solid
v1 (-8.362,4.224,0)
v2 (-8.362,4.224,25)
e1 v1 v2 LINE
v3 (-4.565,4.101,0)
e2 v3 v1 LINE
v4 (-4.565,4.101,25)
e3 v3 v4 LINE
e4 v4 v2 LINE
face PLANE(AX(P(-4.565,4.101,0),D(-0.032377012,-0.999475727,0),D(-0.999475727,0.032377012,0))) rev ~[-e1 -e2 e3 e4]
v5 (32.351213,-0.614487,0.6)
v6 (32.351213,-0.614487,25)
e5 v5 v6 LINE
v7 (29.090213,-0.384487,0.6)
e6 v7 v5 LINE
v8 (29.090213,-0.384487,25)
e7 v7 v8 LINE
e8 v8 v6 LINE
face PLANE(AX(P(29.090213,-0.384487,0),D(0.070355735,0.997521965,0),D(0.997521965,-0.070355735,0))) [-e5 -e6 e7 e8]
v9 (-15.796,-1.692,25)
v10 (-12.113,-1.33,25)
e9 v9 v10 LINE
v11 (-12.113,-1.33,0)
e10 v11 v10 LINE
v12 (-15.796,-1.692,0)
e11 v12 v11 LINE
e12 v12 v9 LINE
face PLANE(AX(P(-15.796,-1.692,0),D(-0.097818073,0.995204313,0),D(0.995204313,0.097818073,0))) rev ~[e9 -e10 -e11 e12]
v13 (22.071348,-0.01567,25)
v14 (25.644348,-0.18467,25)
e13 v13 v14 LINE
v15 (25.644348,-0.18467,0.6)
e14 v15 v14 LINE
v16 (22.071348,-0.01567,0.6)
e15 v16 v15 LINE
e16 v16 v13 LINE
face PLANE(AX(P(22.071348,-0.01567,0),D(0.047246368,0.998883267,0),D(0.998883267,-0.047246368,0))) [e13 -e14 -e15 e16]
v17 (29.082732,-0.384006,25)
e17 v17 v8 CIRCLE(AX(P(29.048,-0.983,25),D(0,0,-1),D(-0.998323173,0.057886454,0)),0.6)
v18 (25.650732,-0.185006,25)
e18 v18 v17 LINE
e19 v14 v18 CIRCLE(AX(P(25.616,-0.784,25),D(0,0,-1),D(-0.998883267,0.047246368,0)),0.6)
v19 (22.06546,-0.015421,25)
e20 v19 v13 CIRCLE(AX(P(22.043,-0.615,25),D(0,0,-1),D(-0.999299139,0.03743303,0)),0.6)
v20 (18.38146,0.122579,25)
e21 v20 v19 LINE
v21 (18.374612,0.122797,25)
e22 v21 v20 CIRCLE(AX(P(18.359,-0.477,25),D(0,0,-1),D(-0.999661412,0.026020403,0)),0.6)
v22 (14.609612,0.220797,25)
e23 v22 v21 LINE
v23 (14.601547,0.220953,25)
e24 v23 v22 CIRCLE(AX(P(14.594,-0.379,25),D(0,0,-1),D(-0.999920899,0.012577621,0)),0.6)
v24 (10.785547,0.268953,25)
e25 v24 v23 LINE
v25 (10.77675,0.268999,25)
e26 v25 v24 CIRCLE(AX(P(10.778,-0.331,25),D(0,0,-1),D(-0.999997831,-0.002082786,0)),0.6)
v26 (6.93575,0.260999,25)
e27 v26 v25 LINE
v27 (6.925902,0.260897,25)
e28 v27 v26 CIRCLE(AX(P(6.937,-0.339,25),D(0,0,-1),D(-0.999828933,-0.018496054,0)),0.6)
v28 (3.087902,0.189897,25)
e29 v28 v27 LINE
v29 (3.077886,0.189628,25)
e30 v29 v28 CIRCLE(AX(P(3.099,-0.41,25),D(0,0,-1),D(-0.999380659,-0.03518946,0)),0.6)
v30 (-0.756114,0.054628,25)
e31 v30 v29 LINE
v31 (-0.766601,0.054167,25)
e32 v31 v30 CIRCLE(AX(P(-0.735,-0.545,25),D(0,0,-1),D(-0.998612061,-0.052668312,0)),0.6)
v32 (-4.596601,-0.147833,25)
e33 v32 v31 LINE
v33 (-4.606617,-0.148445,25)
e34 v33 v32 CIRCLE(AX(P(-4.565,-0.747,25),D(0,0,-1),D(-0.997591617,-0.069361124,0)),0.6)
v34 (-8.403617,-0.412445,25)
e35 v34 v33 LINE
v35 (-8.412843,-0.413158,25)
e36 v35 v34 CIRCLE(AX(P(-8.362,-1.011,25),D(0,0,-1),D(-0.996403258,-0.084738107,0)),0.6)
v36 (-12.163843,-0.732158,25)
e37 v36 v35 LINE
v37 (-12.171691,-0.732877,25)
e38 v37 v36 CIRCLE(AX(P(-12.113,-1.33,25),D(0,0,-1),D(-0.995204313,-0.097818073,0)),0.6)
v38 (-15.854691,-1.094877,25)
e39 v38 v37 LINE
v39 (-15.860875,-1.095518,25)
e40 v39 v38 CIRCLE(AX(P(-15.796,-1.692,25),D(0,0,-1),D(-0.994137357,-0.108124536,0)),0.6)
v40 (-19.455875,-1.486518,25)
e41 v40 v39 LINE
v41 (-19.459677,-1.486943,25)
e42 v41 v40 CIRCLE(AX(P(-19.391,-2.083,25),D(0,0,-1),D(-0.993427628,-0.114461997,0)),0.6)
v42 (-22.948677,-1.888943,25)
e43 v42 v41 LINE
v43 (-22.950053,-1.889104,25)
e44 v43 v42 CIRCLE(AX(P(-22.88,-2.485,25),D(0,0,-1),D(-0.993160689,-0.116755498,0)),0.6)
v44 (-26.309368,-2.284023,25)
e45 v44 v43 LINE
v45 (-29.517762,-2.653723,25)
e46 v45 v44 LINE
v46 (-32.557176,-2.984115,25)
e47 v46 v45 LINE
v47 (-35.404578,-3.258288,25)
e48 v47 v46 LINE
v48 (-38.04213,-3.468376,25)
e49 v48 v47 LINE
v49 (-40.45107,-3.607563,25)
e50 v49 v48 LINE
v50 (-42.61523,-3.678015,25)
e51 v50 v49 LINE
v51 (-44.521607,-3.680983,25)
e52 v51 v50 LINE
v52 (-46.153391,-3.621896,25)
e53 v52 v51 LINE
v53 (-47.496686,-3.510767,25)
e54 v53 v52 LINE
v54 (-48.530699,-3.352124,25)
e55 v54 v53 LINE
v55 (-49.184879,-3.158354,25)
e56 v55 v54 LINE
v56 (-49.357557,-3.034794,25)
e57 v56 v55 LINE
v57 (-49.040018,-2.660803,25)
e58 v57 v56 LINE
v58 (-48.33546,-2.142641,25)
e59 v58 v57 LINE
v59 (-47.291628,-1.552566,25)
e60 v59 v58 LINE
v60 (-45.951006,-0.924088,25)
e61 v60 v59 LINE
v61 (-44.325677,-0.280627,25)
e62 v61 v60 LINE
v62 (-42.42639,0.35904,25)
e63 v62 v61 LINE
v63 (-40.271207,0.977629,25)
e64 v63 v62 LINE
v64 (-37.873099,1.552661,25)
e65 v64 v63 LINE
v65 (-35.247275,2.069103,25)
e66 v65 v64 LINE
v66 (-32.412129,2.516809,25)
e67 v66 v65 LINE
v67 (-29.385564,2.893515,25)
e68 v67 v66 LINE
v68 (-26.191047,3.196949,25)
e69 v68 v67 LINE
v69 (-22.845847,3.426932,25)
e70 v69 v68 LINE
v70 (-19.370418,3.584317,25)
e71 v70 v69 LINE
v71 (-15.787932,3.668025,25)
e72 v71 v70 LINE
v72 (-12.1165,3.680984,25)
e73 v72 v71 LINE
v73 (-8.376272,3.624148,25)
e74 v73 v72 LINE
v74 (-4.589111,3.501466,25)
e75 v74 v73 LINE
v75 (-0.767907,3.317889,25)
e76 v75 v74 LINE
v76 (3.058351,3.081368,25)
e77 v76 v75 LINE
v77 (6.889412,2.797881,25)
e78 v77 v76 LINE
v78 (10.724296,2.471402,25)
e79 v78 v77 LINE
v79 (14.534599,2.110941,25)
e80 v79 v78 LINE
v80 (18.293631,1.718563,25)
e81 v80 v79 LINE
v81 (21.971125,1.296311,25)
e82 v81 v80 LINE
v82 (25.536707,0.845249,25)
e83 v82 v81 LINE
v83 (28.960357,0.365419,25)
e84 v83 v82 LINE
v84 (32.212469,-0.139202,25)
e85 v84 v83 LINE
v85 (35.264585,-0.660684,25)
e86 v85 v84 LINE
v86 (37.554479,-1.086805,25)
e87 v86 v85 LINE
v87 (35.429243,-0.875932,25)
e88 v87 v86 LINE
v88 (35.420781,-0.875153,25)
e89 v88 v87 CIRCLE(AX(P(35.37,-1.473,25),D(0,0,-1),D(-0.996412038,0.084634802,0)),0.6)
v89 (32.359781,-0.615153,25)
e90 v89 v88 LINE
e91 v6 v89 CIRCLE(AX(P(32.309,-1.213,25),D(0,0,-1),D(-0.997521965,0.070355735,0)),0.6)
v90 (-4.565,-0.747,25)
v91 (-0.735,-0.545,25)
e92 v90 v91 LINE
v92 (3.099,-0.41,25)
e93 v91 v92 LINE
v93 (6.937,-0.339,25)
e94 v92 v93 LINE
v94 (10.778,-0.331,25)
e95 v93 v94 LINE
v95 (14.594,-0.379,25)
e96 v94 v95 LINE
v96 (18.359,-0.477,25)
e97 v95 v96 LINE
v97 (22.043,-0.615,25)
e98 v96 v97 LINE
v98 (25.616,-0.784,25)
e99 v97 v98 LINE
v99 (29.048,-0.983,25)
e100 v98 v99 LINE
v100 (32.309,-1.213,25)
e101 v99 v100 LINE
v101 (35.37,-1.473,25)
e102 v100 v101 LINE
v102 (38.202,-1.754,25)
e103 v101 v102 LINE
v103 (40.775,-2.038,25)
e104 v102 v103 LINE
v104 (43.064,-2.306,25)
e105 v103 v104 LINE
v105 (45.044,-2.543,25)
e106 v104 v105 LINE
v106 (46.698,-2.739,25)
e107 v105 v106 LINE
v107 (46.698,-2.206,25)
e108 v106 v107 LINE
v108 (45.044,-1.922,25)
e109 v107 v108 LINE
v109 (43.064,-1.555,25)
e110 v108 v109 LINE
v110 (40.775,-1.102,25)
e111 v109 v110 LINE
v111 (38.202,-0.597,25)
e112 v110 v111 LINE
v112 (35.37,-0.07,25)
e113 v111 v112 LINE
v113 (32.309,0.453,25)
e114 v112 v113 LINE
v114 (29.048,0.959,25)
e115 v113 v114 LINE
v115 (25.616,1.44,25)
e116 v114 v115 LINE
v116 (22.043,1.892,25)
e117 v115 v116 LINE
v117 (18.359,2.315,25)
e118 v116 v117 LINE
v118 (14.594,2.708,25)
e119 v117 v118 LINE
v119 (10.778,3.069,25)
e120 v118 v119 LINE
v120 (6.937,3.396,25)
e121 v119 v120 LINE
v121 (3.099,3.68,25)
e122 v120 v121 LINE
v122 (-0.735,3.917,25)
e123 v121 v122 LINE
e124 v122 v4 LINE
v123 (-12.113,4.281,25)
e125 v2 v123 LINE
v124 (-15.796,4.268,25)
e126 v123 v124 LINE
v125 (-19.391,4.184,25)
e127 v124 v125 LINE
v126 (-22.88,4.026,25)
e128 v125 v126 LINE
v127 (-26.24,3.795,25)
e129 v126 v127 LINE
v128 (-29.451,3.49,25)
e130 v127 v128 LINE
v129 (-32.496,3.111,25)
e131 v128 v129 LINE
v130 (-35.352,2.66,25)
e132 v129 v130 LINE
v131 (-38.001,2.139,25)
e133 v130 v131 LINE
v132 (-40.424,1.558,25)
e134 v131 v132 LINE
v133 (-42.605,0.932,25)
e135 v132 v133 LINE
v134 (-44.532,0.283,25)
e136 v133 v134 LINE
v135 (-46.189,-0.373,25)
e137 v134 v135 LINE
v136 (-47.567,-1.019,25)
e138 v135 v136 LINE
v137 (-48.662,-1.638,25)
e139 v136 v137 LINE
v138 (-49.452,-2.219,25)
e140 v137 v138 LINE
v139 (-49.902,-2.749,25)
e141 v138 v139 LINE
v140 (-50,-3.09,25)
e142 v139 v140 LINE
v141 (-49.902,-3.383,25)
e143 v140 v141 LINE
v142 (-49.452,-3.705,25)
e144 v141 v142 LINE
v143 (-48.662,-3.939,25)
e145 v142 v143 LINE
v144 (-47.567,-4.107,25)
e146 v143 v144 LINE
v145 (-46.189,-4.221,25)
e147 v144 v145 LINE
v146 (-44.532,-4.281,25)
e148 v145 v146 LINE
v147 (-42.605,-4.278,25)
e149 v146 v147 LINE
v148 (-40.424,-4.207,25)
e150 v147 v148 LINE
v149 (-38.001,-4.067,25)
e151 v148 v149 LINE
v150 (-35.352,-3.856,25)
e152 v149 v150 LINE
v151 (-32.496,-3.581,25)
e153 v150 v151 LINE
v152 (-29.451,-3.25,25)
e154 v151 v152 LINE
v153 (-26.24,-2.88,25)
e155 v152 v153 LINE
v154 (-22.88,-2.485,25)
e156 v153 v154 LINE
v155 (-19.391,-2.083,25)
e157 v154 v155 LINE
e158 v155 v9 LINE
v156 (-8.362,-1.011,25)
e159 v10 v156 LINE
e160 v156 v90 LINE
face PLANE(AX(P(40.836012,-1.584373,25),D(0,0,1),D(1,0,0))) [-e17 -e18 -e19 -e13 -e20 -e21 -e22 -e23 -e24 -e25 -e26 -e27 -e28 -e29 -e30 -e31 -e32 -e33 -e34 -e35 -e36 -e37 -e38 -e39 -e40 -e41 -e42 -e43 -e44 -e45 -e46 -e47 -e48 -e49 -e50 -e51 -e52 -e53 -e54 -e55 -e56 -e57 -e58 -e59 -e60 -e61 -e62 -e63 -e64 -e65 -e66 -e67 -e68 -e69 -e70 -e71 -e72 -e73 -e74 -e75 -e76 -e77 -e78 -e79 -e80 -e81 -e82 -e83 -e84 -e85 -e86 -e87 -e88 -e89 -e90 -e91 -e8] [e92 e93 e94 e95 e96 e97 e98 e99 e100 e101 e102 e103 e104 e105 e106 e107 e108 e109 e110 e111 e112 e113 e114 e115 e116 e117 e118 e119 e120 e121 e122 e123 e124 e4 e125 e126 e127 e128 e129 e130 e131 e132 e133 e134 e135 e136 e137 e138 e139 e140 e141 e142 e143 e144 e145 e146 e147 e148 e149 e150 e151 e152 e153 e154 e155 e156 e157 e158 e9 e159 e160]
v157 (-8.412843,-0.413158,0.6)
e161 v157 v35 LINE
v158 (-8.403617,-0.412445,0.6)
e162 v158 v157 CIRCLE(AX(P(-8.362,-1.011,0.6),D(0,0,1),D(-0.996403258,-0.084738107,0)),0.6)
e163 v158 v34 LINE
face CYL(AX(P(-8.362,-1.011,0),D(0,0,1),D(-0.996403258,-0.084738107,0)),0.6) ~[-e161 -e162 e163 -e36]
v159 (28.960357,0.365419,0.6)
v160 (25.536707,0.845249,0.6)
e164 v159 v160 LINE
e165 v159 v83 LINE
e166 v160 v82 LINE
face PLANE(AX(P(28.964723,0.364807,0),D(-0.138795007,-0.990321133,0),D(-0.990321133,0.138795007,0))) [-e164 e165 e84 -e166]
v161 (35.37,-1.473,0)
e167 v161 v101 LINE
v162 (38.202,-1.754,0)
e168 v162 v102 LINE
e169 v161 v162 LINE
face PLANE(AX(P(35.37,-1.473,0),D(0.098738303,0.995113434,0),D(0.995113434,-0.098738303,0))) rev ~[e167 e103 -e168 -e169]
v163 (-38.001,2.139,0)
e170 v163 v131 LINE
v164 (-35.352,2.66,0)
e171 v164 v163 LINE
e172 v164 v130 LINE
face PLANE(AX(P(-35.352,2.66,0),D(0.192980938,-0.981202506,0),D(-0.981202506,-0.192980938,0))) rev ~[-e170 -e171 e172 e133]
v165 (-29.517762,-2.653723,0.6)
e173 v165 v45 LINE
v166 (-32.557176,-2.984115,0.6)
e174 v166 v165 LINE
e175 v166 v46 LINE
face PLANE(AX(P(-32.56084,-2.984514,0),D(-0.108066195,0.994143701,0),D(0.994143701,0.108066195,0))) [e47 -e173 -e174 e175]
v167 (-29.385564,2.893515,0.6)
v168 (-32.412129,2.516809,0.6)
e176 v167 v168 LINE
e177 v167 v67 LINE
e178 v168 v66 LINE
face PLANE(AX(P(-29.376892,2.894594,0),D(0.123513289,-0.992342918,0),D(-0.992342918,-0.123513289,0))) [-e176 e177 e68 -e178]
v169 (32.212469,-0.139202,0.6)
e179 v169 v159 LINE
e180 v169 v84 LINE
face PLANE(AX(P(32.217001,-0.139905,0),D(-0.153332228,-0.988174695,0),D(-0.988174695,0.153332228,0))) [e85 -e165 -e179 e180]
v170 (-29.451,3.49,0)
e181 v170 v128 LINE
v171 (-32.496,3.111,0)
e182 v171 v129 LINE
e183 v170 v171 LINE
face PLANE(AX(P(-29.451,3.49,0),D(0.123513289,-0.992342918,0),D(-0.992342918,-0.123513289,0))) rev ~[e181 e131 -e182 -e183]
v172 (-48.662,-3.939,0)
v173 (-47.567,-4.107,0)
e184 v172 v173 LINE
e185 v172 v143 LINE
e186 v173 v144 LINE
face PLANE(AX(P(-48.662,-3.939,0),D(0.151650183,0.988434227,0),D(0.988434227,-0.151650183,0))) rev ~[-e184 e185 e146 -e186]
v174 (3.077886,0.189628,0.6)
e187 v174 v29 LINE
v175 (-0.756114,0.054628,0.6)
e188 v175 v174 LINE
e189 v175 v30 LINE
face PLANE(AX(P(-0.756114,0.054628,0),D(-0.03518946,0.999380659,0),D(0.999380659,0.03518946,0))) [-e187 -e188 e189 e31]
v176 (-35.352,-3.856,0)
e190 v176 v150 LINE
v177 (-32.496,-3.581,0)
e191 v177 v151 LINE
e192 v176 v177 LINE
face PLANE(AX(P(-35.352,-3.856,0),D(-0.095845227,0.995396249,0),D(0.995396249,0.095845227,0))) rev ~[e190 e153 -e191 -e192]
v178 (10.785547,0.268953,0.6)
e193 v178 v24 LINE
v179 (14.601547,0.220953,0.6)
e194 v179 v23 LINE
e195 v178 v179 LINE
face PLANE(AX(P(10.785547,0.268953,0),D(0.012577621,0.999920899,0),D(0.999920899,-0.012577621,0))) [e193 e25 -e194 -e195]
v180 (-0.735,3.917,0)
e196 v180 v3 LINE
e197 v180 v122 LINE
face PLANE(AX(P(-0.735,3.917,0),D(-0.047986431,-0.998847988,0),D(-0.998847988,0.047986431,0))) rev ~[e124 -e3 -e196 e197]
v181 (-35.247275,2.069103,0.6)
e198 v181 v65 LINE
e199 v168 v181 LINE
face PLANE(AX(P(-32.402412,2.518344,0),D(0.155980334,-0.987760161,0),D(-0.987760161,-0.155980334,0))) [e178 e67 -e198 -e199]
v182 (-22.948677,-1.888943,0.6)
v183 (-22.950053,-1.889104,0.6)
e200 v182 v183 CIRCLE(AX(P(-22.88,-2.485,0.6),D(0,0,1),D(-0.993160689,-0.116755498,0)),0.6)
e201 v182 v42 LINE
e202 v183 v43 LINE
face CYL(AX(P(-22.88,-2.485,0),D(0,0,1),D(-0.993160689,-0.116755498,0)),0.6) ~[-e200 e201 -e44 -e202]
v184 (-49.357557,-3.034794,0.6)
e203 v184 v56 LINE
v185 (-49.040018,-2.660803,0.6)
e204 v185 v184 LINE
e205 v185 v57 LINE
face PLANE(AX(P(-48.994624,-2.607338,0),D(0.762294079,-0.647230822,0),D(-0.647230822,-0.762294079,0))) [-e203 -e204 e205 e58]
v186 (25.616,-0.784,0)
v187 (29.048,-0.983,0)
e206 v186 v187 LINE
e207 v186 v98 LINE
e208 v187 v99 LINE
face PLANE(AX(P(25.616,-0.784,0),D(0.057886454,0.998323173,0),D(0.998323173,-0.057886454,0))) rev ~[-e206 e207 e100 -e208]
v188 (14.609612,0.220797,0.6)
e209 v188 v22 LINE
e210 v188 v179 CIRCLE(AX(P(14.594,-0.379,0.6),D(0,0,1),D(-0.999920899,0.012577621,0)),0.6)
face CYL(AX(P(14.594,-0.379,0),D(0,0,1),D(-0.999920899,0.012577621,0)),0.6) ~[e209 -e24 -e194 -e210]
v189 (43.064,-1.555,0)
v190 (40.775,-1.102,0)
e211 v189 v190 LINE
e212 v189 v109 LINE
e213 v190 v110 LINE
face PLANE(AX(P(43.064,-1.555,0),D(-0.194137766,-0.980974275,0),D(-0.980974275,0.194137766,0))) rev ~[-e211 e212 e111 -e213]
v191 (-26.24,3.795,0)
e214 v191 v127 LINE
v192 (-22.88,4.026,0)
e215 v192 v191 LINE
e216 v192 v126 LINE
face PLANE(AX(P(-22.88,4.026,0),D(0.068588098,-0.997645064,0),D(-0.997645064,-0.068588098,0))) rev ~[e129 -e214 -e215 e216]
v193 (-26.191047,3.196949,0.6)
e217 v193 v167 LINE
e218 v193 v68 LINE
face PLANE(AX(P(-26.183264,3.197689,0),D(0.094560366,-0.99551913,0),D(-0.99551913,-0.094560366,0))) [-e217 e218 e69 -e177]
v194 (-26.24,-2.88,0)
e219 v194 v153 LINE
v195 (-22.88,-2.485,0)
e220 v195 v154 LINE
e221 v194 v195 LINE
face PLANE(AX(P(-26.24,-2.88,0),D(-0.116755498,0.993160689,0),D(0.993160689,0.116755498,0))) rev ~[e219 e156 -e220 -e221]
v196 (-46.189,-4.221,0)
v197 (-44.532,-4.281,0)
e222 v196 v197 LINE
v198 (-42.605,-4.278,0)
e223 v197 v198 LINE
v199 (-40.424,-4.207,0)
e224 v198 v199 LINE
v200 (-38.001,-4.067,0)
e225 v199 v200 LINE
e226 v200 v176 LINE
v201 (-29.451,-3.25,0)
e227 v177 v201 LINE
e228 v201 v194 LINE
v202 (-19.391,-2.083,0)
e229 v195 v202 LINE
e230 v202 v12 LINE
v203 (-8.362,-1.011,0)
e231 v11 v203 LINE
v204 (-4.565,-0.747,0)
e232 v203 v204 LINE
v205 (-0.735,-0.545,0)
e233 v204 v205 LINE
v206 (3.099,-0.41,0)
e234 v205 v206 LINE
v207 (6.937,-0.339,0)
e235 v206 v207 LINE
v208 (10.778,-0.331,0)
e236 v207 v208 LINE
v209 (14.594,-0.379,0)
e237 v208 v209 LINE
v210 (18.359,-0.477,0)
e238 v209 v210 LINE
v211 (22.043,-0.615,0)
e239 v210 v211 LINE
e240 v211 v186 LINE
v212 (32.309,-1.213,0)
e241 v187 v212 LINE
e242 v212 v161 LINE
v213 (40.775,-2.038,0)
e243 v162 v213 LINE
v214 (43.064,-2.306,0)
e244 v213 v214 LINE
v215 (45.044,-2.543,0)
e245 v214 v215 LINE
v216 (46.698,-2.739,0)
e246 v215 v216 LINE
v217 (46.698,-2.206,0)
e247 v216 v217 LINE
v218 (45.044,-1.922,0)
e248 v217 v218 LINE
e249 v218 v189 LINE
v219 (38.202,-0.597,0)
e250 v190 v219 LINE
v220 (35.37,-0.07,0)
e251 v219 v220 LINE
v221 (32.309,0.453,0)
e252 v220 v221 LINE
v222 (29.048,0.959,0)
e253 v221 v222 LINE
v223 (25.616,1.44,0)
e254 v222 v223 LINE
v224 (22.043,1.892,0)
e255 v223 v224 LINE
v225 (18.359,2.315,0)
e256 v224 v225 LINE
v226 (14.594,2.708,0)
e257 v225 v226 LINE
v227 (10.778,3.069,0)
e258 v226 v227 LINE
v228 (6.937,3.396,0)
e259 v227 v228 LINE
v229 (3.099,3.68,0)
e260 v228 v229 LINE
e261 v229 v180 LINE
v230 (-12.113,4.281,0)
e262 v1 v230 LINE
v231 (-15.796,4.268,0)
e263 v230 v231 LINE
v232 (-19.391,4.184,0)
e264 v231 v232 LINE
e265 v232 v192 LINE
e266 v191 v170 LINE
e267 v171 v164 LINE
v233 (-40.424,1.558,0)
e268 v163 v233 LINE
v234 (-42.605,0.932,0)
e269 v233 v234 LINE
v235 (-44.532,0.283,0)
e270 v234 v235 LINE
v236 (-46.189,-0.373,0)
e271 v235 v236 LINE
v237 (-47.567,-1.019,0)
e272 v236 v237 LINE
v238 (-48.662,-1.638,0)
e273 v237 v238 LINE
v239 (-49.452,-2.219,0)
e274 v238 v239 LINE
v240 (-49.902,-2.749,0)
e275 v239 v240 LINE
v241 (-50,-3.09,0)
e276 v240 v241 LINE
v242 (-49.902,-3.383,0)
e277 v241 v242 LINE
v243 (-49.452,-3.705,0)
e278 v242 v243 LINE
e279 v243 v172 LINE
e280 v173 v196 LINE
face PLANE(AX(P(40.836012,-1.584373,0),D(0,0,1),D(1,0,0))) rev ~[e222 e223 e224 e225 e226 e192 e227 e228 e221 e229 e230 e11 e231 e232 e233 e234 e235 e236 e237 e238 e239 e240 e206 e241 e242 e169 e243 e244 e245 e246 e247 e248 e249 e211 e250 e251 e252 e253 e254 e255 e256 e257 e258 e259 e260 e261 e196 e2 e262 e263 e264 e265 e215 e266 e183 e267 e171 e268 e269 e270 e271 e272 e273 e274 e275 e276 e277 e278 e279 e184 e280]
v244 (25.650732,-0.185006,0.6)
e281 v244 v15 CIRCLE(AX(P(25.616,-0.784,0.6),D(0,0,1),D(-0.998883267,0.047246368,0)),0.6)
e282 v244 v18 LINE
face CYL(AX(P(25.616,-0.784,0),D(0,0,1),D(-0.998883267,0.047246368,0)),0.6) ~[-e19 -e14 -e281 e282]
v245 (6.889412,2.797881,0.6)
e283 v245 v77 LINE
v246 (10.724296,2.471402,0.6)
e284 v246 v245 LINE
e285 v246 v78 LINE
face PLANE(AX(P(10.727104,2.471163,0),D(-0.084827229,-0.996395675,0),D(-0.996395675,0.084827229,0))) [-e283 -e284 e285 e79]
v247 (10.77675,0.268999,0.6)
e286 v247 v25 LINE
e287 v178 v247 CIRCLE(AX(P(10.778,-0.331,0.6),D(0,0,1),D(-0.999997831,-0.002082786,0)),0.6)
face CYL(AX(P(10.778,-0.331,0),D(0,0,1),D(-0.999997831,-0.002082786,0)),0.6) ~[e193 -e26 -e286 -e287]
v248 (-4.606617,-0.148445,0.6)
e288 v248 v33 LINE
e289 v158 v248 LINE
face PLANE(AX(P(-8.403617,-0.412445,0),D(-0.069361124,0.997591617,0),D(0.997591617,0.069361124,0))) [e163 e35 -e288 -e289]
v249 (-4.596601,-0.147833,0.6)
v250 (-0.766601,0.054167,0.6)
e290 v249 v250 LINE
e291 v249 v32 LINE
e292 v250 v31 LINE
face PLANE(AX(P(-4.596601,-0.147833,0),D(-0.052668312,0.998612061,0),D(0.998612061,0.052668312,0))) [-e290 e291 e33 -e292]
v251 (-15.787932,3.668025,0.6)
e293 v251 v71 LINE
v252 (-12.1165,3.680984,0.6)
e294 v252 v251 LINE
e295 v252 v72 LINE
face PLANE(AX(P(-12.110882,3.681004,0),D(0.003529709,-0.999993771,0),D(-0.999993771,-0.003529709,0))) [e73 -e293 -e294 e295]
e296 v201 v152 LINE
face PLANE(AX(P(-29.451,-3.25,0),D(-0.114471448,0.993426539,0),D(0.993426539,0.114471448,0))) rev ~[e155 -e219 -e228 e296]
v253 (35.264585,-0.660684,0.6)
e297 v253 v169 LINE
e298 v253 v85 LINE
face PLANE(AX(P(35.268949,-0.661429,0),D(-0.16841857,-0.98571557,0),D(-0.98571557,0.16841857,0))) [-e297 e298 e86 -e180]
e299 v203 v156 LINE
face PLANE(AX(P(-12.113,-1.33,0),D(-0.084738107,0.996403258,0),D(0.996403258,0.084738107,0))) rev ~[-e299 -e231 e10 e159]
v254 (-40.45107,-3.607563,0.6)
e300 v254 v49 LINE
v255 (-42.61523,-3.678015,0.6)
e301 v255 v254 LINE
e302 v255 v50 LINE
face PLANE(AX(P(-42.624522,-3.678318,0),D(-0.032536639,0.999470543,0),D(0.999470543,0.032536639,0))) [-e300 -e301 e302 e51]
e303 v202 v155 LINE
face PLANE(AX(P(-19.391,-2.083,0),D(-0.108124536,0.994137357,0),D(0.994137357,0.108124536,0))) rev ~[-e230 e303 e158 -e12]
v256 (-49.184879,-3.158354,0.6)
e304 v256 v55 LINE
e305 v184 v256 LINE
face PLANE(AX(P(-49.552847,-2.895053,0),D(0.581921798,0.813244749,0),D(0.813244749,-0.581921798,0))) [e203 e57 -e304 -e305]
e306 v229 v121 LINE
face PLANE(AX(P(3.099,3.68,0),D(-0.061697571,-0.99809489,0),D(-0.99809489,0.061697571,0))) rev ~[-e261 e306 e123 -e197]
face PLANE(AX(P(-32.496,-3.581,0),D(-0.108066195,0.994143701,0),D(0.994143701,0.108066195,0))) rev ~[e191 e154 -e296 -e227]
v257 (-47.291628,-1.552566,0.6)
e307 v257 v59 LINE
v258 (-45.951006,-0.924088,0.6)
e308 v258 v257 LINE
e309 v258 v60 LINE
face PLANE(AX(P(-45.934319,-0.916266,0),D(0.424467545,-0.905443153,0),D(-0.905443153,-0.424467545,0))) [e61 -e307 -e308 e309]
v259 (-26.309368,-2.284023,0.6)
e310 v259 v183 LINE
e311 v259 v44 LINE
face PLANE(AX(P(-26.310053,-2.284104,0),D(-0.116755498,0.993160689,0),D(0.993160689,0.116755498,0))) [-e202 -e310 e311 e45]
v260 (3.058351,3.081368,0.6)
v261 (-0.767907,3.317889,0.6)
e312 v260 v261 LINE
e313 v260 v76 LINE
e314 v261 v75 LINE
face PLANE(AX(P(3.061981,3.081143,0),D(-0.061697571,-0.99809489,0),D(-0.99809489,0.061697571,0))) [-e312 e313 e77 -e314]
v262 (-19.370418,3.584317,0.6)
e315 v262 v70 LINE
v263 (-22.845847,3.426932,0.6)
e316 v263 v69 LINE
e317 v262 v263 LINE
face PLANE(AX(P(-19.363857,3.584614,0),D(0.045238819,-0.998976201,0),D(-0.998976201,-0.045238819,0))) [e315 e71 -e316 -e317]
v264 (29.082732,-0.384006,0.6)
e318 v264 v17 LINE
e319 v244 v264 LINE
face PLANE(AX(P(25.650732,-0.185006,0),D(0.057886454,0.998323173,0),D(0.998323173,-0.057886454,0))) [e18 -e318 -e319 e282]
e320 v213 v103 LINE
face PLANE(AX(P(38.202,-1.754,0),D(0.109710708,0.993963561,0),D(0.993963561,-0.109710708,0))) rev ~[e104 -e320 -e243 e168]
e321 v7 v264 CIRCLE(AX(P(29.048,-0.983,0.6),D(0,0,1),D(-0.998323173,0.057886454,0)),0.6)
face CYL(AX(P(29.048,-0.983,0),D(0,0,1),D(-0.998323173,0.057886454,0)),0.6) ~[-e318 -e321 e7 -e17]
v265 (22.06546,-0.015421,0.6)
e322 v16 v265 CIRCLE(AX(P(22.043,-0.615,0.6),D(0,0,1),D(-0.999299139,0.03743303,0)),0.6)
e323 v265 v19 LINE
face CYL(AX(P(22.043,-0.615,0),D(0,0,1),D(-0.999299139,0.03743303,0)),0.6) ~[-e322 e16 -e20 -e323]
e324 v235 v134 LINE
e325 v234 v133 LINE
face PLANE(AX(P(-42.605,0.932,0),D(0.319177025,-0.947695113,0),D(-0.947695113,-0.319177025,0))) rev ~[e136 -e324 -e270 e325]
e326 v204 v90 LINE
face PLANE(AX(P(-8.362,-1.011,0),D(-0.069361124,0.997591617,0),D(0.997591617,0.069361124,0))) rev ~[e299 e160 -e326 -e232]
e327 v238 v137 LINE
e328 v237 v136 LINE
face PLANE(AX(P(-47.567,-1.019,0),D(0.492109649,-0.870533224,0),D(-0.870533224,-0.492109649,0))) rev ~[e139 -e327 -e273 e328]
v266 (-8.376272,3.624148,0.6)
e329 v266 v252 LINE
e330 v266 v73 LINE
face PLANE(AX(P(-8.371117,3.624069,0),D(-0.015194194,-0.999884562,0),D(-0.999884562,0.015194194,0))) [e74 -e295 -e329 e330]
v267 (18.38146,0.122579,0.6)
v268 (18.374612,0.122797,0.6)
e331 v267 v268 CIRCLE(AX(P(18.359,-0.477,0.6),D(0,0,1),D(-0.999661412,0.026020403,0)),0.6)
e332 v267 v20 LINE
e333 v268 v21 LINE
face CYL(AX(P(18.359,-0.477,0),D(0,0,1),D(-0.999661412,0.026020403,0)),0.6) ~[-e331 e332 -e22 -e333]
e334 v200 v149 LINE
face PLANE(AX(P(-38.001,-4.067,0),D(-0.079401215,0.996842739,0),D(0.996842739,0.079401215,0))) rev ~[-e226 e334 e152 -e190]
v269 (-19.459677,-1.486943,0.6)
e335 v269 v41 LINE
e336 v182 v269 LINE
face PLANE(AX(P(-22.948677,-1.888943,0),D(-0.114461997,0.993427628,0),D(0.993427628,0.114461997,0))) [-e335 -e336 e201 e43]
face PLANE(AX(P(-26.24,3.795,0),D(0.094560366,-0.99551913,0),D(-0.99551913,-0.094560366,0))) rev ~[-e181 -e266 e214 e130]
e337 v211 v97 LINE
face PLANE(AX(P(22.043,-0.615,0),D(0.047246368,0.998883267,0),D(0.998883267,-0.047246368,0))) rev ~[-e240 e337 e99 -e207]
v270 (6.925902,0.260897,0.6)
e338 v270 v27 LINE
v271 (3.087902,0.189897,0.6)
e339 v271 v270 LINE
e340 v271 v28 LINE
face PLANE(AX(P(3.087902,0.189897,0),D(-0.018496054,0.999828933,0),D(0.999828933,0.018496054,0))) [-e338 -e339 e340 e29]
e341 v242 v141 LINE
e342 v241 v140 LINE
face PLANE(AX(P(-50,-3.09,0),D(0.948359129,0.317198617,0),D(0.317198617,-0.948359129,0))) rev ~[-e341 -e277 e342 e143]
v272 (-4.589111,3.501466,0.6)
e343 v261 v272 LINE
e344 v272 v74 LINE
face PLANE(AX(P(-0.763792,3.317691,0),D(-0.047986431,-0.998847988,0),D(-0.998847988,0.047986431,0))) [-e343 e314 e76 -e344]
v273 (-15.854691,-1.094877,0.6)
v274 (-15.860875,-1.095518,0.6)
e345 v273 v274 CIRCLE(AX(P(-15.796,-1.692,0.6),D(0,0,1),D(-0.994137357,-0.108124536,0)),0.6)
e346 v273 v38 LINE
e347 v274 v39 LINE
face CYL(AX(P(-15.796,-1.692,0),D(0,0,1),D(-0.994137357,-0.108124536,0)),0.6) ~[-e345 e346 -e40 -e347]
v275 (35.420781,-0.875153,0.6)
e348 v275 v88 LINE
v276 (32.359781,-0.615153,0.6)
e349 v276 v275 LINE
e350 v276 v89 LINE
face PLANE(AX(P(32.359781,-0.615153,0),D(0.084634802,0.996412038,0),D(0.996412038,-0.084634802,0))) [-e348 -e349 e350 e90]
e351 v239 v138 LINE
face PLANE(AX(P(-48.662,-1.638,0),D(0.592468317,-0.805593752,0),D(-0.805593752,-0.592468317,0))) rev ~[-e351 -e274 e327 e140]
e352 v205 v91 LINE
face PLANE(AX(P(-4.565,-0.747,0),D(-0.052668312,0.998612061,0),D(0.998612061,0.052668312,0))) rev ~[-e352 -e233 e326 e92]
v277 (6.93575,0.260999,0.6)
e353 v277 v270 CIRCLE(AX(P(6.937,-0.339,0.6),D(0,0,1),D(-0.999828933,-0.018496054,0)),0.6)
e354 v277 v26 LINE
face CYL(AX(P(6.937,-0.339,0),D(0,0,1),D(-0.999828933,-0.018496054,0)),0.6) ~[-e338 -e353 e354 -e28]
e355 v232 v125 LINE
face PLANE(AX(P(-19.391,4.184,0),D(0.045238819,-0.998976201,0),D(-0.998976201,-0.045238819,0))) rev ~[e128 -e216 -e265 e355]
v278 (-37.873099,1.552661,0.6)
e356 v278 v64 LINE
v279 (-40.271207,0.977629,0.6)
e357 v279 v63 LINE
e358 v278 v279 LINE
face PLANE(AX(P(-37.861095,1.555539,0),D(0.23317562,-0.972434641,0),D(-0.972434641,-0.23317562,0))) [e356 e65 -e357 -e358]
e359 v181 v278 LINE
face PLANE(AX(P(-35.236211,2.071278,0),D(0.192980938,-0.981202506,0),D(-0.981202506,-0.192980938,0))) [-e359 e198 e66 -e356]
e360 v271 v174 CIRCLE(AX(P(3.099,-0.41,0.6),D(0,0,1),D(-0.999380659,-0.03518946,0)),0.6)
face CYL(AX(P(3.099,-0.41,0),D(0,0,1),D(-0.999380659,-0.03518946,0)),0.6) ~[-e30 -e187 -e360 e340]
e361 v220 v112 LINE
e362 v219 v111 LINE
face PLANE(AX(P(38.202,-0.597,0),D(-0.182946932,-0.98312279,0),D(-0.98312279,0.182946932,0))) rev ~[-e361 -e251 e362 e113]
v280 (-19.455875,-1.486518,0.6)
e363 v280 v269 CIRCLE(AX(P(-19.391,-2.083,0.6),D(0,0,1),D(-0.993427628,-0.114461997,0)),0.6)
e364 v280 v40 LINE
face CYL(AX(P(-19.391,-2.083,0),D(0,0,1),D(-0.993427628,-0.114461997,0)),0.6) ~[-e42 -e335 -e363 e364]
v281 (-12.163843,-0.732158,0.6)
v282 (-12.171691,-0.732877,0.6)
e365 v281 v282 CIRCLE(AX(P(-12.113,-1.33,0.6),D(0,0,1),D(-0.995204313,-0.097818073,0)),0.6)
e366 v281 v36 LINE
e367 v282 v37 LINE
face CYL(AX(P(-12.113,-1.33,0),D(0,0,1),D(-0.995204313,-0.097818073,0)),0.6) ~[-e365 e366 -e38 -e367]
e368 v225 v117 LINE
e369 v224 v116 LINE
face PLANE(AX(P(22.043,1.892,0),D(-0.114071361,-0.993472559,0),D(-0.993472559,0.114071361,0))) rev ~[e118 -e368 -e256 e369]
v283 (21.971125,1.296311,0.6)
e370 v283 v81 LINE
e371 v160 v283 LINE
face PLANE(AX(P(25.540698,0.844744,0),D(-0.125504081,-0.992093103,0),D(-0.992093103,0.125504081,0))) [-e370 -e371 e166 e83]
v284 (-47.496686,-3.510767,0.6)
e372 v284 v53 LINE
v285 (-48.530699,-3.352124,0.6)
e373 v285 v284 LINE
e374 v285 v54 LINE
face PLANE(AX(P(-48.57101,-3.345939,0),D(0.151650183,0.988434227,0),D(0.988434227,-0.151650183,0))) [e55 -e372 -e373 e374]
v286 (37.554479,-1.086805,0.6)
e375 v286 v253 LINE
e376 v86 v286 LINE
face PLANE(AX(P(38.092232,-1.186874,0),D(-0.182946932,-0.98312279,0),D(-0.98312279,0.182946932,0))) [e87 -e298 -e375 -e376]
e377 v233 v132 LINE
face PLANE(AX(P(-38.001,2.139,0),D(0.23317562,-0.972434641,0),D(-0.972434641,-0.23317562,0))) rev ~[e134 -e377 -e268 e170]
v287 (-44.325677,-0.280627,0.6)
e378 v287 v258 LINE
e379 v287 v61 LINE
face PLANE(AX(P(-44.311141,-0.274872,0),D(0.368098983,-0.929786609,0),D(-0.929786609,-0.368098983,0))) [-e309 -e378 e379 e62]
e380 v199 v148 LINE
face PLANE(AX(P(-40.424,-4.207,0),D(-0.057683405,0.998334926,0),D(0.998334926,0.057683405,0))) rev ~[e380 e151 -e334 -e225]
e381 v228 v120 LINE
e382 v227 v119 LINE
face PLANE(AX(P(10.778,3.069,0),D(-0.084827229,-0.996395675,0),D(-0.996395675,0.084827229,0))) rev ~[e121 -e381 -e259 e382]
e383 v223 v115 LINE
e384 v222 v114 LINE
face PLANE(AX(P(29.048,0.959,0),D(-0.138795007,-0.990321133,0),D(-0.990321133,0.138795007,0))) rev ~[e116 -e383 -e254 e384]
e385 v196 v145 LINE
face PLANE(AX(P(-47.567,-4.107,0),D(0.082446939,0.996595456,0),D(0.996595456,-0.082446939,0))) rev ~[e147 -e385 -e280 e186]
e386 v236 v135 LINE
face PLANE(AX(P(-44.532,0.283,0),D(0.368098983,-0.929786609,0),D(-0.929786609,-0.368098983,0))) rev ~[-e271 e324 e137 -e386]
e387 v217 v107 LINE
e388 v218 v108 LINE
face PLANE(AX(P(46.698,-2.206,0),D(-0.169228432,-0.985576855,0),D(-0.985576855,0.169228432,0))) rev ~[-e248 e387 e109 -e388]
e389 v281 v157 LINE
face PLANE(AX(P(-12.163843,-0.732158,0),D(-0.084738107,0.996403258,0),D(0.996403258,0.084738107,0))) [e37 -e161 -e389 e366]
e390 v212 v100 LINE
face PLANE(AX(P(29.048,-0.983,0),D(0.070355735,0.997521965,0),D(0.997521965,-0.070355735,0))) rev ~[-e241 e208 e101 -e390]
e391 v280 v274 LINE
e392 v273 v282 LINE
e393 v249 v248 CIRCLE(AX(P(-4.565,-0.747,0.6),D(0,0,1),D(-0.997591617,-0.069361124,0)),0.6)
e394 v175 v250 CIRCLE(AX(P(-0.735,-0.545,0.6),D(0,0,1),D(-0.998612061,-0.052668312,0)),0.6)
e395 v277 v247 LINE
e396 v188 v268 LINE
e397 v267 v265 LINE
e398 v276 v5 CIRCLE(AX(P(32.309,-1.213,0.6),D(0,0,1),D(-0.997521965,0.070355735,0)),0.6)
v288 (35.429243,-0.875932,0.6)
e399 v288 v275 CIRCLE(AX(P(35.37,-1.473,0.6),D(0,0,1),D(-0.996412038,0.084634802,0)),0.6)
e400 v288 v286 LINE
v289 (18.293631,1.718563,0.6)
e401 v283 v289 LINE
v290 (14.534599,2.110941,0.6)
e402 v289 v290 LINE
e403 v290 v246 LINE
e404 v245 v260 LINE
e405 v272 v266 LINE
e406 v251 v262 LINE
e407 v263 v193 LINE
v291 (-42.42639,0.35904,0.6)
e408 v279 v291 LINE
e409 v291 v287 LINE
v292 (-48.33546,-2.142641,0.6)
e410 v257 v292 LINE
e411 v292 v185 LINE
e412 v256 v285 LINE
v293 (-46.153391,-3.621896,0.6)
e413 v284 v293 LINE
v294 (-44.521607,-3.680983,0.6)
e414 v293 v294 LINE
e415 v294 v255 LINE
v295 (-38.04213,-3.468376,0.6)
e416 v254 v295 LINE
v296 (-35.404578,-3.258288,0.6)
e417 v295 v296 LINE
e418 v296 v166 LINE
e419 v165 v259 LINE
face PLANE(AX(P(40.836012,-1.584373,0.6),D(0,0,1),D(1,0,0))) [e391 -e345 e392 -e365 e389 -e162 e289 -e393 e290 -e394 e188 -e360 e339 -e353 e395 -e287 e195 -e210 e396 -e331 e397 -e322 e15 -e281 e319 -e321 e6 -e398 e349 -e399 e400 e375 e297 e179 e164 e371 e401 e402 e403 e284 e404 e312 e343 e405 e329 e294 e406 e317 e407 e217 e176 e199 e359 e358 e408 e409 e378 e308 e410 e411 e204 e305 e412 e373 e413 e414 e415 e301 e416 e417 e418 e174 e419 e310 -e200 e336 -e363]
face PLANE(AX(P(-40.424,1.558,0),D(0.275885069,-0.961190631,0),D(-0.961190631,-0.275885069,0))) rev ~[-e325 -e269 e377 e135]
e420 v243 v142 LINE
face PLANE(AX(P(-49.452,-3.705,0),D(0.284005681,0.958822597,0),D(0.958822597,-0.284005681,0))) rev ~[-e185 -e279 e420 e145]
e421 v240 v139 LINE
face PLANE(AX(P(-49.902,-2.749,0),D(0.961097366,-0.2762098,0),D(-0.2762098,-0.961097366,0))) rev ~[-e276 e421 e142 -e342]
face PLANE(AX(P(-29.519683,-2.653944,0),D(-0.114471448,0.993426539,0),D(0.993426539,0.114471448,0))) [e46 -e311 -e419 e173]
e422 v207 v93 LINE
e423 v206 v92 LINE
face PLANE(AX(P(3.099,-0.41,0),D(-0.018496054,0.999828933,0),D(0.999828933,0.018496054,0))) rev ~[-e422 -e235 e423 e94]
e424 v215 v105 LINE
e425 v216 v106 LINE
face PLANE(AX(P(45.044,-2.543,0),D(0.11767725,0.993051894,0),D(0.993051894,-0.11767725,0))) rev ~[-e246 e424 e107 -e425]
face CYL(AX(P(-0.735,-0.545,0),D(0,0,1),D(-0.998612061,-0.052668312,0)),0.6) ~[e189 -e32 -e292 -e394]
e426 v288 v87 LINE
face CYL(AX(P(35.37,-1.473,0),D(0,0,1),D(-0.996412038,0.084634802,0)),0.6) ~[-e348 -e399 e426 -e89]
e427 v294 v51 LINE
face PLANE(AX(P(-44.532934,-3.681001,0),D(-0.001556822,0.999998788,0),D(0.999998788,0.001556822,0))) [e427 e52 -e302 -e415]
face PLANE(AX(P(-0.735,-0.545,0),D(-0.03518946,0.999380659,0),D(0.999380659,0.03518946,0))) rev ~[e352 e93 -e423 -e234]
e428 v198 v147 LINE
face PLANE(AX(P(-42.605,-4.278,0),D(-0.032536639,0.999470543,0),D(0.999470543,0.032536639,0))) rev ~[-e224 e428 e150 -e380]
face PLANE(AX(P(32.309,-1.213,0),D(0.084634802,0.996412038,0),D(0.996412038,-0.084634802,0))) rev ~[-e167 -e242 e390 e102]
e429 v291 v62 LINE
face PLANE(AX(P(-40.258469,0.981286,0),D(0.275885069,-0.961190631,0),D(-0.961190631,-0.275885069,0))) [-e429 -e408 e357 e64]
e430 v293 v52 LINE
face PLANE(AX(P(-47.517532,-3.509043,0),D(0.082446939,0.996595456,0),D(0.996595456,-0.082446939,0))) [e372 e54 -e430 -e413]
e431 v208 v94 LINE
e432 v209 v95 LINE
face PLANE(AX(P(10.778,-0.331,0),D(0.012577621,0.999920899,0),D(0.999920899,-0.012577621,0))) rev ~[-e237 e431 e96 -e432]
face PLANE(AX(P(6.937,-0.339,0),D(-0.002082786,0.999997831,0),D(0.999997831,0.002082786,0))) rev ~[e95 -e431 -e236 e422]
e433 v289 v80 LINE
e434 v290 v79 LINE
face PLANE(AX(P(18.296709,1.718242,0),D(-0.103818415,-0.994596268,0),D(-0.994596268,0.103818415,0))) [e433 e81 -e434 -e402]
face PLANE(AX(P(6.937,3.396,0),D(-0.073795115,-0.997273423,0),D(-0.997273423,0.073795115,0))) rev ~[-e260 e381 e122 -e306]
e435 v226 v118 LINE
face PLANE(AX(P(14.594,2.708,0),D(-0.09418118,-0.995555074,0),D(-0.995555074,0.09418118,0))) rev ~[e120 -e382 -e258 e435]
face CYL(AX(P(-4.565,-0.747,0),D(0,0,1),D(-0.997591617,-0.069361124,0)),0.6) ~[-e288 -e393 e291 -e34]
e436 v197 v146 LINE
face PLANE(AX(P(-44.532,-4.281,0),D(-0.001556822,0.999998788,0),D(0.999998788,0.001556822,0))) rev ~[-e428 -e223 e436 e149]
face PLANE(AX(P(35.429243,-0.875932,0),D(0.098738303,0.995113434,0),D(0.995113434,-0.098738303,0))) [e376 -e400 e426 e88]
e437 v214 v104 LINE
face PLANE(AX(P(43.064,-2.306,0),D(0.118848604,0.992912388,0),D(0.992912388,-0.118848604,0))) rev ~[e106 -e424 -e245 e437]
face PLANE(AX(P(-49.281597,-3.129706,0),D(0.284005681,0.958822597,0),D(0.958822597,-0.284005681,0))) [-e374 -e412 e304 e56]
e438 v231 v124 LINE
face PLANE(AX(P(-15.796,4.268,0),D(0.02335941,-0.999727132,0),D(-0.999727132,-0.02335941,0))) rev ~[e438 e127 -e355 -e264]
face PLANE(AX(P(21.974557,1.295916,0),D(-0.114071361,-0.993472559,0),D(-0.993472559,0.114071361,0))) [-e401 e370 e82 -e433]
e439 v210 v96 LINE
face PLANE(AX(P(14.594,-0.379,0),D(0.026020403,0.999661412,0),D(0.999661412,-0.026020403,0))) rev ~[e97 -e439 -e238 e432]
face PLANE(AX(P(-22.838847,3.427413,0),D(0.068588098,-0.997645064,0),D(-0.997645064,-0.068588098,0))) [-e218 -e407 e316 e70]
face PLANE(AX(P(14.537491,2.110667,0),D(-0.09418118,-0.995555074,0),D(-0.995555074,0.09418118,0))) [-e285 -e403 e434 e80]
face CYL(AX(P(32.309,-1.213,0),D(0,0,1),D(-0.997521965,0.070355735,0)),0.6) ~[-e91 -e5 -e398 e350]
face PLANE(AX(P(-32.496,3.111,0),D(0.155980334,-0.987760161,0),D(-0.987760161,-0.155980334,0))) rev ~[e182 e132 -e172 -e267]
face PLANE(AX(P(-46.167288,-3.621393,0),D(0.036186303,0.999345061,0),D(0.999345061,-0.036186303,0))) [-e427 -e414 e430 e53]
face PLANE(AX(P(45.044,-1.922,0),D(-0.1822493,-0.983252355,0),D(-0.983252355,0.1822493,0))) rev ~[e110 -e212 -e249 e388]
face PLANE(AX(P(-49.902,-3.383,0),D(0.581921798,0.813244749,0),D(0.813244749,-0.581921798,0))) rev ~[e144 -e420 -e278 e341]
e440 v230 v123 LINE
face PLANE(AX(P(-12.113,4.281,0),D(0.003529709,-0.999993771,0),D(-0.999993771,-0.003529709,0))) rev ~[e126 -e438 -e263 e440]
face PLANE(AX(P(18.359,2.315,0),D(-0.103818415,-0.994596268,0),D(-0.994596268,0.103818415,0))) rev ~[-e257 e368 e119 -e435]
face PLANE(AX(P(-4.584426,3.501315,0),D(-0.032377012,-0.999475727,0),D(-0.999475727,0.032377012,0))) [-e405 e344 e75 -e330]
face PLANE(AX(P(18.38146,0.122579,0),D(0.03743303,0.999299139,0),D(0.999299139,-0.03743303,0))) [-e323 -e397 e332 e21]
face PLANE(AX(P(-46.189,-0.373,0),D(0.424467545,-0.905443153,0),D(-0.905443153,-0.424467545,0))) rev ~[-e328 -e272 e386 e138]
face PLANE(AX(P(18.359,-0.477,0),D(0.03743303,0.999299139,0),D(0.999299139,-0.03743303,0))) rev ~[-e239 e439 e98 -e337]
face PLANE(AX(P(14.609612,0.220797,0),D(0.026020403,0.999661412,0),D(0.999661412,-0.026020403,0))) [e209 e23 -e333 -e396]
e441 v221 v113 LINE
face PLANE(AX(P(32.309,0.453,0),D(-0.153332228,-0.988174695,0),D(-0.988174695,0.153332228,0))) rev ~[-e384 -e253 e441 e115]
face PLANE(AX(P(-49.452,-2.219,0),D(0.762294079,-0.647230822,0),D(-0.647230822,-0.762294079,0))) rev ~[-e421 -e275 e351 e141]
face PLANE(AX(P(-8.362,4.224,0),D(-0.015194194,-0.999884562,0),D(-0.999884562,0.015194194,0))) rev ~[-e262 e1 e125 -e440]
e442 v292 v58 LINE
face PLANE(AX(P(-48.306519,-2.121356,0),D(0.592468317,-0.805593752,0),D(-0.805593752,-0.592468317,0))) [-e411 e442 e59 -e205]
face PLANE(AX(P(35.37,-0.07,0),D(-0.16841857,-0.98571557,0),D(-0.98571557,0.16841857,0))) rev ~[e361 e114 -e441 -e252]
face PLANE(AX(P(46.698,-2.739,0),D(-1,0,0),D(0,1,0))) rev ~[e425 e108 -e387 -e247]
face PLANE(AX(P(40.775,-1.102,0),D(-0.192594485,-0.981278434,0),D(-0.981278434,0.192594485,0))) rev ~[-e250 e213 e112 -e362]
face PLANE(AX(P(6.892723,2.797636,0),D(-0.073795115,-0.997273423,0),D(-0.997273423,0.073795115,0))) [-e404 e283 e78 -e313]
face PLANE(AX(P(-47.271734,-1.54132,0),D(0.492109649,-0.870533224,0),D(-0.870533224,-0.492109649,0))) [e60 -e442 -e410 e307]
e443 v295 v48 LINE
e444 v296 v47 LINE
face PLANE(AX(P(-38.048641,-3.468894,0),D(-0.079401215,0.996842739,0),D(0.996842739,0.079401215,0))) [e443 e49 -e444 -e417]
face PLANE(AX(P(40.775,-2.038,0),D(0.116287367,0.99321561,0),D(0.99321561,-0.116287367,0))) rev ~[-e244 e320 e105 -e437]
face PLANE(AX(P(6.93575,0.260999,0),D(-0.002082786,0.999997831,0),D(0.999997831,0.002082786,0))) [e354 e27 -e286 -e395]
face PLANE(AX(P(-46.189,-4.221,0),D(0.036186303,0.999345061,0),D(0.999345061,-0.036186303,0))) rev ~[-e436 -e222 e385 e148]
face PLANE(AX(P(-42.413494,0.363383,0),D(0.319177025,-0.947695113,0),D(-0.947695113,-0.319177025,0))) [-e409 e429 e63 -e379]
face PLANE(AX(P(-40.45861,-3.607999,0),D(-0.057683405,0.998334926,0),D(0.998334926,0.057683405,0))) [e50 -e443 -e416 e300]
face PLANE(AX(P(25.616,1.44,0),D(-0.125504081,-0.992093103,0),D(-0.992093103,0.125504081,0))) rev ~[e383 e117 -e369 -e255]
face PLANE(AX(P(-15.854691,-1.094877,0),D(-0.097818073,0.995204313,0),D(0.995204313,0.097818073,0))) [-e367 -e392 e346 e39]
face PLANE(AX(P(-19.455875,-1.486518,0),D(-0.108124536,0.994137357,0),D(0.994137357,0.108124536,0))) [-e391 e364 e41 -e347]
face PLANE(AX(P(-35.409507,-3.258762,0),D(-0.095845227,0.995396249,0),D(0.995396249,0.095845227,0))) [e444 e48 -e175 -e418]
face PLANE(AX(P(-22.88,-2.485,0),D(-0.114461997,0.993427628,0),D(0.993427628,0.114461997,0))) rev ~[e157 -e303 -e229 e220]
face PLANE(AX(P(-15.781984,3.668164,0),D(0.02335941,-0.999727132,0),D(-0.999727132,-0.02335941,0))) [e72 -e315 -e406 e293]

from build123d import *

# Parameters (mm, degrees)
F1_DEPTH = 25
F2_T     = -0.6


# Not quite as in the source:
# - a feature names something its author has since deleted; it is built from what else it names


with BuildPart() as f1:
    # F0 (on Top) → F1 (new body)
    with BuildSketch(Plane.XY):
        Polygon((46.698, -2.739), (46.698, -2.206), (45.044, -1.922), (43.064, -1.555), (40.775, -1.102), (38.202, -0.597), (35.37, -0.07), (35.37, -1.473), (38.202, -1.754), (40.775, -2.038), (43.064, -2.306), (45.044, -2.543), align=None)
        Polygon((35.37, -1.473), (35.37, -0.07), (32.309, 0.453), (29.048, 0.959), (25.616, 1.44), (22.043, 1.892), (18.359, 2.315), (14.594, 2.708), (10.778, 3.069), (6.937, 3.396), (3.099, 3.68), (-0.735, 3.917), (-4.565, 4.101), (-8.362, 4.224), (-12.113, 4.281), (-15.796, 4.268), (-19.391, 4.184), (-22.88, 4.026), (-26.24, 3.795), (-29.451, 3.49), (-32.496, 3.111), (-35.352, 2.66), (-38.001, 2.139), (-40.424, 1.558), (-42.605, 0.932), (-44.532, 0.283), (-46.189, -0.373), (-47.567, -1.019), (-48.662, -1.638), (-49.452, -2.219), (-49.902, -2.749), (-50, -3.09), (-49.902, -3.383), (-49.452, -3.705), (-48.662, -3.939), (-47.567, -4.107), (-46.189, -4.221), (-44.532, -4.281), (-42.605, -4.278), (-40.424, -4.207), (-38.001, -4.067), (-35.352, -3.856), (-32.496, -3.581), (-29.451, -3.25), (-26.24, -2.88), (-22.88, -2.485), (-19.391, -2.083), (-15.796, -1.692), (-12.113, -1.33), (-8.362, -1.011), (-4.565, -0.747), (-0.735, -0.545), (3.099, -0.41), (6.937, -0.339), (10.778, -0.331), (14.594, -0.379), (18.359, -0.477), (22.043, -0.615), (25.616, -0.784), (29.048, -0.983), (32.309, -1.213), align=None)
    extrude(amount=F1_DEPTH)

    # F2
    f2_openings = [f1.faces().sort_by_distance(p)[0] for p in [
        (-12.597329, 0.423659, 25),
    ]]
    offset(amount=F2_T, openings=f2_openings)


solid = f1.part
